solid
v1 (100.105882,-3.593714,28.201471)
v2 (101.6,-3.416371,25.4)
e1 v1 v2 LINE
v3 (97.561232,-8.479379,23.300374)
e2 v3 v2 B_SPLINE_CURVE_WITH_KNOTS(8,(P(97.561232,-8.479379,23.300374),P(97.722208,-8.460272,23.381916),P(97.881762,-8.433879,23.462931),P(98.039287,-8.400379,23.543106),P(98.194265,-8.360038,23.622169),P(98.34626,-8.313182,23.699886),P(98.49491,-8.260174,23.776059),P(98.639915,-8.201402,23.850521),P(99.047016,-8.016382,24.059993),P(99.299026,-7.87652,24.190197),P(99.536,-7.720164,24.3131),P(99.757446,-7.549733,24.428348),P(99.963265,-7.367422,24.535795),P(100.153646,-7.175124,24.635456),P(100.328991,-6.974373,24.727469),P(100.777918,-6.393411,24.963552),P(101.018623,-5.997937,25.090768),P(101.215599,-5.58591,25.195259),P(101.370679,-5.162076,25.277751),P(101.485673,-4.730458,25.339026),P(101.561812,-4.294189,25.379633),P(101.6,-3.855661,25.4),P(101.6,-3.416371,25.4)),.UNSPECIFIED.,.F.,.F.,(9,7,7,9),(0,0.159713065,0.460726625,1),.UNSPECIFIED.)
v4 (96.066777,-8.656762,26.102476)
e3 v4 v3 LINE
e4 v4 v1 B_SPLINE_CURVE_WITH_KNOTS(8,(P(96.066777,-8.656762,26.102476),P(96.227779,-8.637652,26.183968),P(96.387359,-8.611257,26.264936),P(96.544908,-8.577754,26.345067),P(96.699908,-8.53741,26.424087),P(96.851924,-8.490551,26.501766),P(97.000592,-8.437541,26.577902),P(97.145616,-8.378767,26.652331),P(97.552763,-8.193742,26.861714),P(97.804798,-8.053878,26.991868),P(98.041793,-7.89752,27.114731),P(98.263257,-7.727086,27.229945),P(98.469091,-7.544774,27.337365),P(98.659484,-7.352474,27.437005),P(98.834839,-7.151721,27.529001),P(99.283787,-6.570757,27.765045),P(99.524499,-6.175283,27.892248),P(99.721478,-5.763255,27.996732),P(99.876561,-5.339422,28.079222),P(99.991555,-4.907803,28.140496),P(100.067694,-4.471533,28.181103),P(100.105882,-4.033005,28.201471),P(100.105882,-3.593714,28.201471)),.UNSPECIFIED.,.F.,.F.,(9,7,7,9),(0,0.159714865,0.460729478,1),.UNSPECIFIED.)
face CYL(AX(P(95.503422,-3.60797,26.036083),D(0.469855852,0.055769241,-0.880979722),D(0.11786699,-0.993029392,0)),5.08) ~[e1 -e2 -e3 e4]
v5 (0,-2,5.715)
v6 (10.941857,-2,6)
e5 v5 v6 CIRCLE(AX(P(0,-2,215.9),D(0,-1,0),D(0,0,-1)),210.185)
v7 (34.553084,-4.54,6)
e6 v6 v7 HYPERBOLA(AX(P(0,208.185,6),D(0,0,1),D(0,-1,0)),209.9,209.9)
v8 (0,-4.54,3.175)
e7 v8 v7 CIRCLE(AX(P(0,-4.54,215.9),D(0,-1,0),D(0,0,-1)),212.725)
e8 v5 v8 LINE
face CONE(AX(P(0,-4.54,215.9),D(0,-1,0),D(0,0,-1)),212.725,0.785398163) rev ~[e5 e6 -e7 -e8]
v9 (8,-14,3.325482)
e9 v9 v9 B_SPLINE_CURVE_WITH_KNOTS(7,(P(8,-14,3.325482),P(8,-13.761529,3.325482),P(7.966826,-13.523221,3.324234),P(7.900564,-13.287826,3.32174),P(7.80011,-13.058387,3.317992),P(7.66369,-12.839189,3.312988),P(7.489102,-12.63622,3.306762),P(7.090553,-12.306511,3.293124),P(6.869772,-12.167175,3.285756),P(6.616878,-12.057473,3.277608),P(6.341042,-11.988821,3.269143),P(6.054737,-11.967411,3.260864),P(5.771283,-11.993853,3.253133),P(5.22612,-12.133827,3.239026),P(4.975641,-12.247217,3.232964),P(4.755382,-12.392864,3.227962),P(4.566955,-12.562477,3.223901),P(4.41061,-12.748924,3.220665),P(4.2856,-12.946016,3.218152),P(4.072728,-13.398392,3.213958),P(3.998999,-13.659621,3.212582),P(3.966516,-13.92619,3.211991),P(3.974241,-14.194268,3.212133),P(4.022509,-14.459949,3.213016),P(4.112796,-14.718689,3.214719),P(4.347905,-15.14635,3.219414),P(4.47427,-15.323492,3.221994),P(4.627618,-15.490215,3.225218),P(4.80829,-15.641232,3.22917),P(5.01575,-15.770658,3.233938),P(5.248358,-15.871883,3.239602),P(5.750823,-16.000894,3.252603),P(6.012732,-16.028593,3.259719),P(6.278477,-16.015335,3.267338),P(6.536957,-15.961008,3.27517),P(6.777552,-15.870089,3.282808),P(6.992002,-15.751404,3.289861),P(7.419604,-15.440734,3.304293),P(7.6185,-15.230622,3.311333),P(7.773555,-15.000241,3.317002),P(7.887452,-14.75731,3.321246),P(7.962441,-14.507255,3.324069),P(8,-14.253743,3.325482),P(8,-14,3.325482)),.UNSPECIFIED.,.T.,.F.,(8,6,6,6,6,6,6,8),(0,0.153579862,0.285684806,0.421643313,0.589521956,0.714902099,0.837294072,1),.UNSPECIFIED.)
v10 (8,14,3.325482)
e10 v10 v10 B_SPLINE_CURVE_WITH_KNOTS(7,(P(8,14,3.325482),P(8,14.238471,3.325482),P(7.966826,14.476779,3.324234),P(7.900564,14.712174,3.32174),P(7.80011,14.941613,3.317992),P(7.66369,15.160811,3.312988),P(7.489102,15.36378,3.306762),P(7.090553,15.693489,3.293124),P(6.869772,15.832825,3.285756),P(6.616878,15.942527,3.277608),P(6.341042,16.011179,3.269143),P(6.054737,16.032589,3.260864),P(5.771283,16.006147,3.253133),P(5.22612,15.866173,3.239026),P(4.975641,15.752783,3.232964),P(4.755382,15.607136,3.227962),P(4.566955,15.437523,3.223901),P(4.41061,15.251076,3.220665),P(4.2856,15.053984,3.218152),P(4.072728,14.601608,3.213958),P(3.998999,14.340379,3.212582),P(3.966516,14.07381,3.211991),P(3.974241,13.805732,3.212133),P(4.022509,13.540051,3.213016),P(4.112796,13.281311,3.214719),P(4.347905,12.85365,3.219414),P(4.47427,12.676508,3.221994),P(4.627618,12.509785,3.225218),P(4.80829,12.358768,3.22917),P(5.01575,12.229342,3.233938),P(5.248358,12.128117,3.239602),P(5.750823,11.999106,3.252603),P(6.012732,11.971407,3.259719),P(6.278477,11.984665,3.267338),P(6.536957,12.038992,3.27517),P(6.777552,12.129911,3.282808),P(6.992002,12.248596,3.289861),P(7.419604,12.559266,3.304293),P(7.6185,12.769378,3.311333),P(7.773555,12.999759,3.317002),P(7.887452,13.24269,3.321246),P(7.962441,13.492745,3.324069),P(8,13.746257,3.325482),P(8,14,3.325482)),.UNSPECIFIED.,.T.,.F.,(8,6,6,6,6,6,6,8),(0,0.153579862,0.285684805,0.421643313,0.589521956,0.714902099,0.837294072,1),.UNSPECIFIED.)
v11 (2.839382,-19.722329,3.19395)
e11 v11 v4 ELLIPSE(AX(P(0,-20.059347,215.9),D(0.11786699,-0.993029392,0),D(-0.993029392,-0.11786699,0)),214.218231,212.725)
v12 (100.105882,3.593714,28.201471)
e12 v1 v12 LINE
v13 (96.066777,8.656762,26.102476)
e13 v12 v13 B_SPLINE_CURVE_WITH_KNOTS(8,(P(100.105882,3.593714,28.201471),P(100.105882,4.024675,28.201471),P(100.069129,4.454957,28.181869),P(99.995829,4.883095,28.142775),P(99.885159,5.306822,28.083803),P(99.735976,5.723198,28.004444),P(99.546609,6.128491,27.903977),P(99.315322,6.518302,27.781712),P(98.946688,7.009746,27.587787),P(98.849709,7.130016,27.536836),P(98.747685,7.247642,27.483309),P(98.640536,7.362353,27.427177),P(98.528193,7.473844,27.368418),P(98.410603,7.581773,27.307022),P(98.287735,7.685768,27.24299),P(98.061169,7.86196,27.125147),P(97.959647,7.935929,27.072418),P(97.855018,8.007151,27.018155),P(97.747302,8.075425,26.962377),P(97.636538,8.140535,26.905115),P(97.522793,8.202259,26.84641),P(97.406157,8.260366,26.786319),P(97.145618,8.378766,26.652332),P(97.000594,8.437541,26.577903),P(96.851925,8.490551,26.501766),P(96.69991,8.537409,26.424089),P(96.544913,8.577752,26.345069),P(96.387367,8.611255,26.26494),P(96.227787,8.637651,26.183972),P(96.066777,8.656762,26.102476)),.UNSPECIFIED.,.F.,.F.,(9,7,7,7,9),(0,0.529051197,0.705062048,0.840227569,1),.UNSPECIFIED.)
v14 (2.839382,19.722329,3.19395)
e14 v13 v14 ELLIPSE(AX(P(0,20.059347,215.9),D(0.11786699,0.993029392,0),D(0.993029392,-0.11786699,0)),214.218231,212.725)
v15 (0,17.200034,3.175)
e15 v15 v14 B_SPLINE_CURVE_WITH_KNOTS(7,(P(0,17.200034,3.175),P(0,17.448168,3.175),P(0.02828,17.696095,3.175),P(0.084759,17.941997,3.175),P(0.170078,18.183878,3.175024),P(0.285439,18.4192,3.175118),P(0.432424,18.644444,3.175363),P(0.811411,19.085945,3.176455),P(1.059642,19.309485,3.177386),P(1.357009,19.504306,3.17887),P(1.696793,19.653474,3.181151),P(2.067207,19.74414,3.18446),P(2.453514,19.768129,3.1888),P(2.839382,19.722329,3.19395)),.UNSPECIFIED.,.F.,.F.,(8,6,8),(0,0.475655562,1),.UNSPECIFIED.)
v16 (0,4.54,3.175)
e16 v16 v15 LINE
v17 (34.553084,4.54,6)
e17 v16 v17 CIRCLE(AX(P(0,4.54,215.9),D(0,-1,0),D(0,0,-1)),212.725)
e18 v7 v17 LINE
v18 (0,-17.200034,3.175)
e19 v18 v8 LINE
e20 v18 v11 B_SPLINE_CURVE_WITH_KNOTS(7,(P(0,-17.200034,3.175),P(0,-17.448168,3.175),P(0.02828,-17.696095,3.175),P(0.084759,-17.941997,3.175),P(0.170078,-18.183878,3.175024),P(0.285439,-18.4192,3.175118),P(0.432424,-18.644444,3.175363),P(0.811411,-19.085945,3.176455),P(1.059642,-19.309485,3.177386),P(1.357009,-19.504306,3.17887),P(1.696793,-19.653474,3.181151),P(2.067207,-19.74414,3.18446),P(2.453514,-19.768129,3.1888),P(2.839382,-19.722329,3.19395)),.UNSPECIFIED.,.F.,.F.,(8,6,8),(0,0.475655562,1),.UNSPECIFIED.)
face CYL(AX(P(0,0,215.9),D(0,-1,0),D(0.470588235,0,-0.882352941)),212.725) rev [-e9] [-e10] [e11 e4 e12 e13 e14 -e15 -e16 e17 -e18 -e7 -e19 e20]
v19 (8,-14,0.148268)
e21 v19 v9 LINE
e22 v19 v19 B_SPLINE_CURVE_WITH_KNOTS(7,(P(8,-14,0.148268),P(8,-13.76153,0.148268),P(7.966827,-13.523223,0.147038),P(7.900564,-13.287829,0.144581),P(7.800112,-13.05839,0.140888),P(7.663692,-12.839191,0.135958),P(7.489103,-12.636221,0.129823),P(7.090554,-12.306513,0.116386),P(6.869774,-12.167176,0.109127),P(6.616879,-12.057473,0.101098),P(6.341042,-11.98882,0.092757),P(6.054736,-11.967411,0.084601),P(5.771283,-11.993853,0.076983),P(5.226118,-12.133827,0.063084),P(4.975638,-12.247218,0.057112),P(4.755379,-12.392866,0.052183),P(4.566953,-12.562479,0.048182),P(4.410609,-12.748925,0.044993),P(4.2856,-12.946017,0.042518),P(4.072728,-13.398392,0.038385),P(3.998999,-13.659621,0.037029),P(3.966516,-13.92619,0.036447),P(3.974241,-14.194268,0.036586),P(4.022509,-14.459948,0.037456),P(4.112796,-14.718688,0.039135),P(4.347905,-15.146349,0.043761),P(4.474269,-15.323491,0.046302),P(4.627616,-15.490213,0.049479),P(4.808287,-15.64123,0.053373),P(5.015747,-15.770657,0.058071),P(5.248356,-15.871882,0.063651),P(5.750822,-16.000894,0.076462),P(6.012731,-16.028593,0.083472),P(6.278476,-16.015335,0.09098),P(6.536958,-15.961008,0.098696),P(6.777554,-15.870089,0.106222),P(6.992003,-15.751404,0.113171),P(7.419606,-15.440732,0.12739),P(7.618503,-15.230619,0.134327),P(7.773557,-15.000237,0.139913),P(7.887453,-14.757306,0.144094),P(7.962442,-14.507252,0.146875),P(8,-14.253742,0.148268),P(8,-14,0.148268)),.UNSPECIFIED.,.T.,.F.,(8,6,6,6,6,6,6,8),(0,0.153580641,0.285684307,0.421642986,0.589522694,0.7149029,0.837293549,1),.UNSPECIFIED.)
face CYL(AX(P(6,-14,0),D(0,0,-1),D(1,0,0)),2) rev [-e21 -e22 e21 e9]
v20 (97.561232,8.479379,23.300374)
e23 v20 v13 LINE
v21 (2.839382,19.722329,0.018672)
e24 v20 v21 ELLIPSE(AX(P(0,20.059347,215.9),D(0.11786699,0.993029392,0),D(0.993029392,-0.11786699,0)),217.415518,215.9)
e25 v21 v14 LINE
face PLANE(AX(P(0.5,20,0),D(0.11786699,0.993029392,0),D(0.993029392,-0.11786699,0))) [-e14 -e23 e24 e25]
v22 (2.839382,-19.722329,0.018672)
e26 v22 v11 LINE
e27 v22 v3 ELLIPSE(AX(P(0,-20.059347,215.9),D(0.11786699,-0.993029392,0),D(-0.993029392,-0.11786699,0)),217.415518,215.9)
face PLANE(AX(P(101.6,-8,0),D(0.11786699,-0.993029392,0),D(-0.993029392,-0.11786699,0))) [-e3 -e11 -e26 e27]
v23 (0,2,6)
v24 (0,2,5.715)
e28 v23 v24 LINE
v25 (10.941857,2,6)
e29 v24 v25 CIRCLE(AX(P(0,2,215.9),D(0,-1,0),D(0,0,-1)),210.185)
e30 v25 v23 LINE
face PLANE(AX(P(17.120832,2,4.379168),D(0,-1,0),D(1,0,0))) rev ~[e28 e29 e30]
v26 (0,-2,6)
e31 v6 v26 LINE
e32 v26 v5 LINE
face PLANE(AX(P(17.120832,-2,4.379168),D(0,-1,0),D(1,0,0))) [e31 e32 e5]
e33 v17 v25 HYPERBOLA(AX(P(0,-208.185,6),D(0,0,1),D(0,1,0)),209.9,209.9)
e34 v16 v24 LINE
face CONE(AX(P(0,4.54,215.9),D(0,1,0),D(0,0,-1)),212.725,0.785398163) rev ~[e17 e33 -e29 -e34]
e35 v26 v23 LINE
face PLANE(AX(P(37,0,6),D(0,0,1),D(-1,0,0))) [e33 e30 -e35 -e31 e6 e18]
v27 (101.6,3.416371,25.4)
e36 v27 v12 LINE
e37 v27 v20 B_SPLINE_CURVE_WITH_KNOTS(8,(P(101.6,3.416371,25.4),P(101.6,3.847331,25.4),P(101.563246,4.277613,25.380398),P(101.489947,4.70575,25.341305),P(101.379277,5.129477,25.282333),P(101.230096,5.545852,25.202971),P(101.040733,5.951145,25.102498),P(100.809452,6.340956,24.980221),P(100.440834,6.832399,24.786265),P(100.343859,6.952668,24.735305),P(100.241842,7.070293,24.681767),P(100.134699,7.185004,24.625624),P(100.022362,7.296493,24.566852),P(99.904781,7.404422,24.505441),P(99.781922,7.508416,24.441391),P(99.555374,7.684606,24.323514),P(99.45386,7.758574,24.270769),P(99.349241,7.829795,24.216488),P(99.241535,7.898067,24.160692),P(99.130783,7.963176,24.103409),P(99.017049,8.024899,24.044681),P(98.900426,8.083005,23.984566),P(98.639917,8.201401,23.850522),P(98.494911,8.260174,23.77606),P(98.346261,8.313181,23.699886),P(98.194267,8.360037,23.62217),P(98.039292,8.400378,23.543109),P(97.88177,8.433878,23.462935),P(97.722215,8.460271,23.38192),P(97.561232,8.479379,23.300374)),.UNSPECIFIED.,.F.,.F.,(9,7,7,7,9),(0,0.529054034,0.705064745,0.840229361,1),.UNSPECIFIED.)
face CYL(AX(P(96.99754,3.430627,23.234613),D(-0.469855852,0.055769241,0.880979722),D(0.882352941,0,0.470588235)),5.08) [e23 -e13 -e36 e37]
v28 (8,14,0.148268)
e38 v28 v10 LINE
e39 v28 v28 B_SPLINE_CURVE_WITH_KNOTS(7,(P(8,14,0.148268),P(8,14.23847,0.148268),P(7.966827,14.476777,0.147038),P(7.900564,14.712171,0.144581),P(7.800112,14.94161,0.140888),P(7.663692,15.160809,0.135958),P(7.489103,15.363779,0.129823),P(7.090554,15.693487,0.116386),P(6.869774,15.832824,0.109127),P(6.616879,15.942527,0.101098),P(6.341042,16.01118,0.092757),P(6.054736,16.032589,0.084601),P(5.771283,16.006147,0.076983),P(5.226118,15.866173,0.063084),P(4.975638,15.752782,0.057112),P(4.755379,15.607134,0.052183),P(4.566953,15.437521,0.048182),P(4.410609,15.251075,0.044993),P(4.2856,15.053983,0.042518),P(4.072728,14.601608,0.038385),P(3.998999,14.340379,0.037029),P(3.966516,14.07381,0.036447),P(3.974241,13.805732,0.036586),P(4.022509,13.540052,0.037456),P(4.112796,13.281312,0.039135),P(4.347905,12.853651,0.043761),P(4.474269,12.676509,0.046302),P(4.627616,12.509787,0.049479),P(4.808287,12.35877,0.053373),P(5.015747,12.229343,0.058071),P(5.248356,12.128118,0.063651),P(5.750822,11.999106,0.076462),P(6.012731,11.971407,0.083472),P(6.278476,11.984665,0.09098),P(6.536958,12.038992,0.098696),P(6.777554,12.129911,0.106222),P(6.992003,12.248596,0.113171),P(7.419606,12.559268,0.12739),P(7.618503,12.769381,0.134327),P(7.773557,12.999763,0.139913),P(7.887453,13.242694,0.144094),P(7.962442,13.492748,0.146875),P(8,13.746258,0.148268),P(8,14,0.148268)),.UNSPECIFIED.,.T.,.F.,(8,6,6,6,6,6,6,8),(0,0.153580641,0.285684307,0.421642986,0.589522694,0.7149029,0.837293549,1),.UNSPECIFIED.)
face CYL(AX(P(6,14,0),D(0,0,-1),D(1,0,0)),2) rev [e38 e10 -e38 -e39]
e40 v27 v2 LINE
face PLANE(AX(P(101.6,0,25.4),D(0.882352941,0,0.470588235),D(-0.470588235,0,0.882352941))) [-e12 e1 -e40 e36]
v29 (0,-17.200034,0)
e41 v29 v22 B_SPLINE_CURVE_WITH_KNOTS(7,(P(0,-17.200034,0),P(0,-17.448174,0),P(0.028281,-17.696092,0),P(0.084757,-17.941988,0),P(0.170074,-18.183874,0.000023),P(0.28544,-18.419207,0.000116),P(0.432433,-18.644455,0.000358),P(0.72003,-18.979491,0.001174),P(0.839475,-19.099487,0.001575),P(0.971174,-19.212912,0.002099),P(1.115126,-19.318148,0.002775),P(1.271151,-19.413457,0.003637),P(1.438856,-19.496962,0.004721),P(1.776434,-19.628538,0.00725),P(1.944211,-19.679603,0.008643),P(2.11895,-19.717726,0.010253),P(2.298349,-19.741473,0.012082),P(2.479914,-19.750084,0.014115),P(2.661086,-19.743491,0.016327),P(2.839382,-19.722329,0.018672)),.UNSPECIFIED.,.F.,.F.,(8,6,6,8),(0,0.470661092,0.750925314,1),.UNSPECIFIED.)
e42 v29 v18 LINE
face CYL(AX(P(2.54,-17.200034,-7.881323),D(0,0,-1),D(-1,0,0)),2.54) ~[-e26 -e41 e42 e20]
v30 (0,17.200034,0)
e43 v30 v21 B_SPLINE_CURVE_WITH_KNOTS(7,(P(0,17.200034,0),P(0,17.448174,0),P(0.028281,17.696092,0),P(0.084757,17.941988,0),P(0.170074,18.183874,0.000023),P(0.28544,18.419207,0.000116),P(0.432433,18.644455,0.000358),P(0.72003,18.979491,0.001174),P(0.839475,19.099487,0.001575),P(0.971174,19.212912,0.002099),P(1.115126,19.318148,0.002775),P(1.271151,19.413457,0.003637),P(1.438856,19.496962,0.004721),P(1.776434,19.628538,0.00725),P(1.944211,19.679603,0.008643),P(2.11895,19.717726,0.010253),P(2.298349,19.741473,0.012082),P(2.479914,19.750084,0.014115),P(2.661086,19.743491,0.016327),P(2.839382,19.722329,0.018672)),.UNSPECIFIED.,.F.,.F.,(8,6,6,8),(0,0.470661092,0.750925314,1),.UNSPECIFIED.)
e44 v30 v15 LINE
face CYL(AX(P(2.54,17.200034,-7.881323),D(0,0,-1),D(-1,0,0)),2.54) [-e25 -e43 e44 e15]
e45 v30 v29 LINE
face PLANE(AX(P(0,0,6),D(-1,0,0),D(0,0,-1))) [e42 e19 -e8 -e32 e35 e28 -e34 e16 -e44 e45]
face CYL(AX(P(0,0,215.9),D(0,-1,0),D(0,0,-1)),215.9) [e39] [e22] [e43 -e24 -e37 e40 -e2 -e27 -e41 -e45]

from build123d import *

# Parameters (mm, degrees)
F1_DEPTH      = 20
F1_DEPTH_BACK = 20
F2_R          = 2
F3_DEPTH      = 25.4
F5_DEPTH      = 50.8
F7_DEPTH      = 2
F7_DEPTH_BACK = 2
F8_SIZE       = 2.54
F9_R          = 5.08
F10_T1_DEPTH  = 15.875
F11_T1_DEPTH  = 18.9511481059


# Not quite as in the source:
# - a fillet or chamfer that OpenCascade refuses, or shapes differently, is made with other operations: its cross-section is extruded or revolved along the edge and cut away or added


with BuildPart() as f1:
    # F0 (on Front) → F1 (new body, two sides)
    with BuildSketch(Plane.XZ) as f1_sk:
        with BuildLine():
            Line((0, 3.175), (0, 0))
            ThreePointArc((0, 0), (52.3634414453, 6.4462342186), (101.6, 25.4))
            Line((101.6, 25.4), (100.1058823529, 28.2014705882))
            ThreePointArc((100.1058823529, 28.2014705882), (51.5933908359, 9.5264366566), (0, 3.175))
        make_face()
    extrude(amount=F1_DEPTH)
    extrude(f1_sk.sketch, amount=-F1_DEPTH_BACK)

    # F2 (on Top) → F3 (cut)
    with BuildSketch(Plane.XY):
        with Locations((6, 14)):
            Circle(F2_R)
        with Locations((6, -14)):
            Circle(F2_R)
    extrude(amount=F3_DEPTH, mode=Mode.SUBTRACT)

    # F4 (on Top) → F5 (cut)
    with BuildSketch(Plane.XY):
        Polygon((0.5, 20), (101.6, 8), (101.6, 20), align=None)
        Polygon((101.6, -8), (0.5, -20), (101.6, -20), align=None)
    extrude(amount=F5_DEPTH, mode=Mode.SUBTRACT)

    # F6 (on Front) → F7 (join, two sides)
    with BuildSketch(Plane.XZ) as f7_sk:
        Polygon((0, 6), (0, 0), (37, 6), align=None)
    extrude(amount=F7_DEPTH)
    extrude(f7_sk.sketch, amount=-F7_DEPTH_BACK)

    # F8
    f8_edges = [f1.edges().sort_by_distance(p)[0] for p in [
        (17.334188, -2, 3.882426),
        (17.334188, 2, 3.882426),
    ]]
    chamfer(f8_edges, length=F8_SIZE)

    # F9
    f9_edges = [f1.edges().sort_by_distance(p)[0] for p in [
        (100.852941, -8.088672, 26.800735),
        (100.852941, 8.088672, 26.800735),
    ]]
    fillet(f9_edges, radius=F9_R)

    # F10: fillet of radius 2.54 on 2 edges, made by hand

    # F10_s2 → F10_t1 (cut)
    with BuildSketch(Plane.XY.offset(-6.35)):
        with BuildLine():
            ThreePointArc((0, -17.46), (0.7439487758, -19.2560512242), (2.54, -20))
            Line((2.54, -20), (0, -20))
            Line((0, -20), (0, -17.46))
        make_face()
        with BuildLine():
            ThreePointArc((2.54, 20), (0.7439487758, 19.2560512242), (0, 17.46))
            Line((0, 17.46), (0, 20))
            Line((0, 20), (2.54, 20))
        make_face()
    extrude(amount=F10_T1_DEPTH, mode=Mode.SUBTRACT)

    # F11: fillet of radius 2.54 on 2 edges, made by hand

    # F11_s2 → F11_t1 (cut)
    with BuildSketch(Plane.XY.offset(-7.8813228745)):
        with BuildLine():
            ThreePointArc((0, -17.2000338729), (0.8531139151, -19.0989849877), (2.8393821549, -19.7223285276))
            Line((2.8393821549, -19.7223285276), (2.8693203704, -19.9745579931))
            Line((2.8693203704, -19.9745579931), (1.7309730402, -20.1096734032))
            Line((1.7309730402, -20.1096734032), (1.6171383071, -20.0971883315))
            ThreePointArc((1.6171383071, -20.0971883315), (-0.254, -17.46), (-0.254, -17.2000338729))
            Line((-0.254, -17.2000338729), (0, -17.2000338729))
        make_face()
        with BuildLine():
            ThreePointArc((0, 17.2000338729), (0.8531139151, 19.0989849877), (2.8393821549, 19.7223285276))
            Line((2.8393821549, 19.7223285276), (2.8693203704, 19.9745579931))
            Line((2.8693203704, 19.9745579931), (1.7309730402, 20.1096734032))
            Line((1.7309730402, 20.1096734032), (1.6171383071, 20.0971883315))
            ThreePointArc((1.6171383071, 20.0971883315), (-0.254, 17.46), (-0.254, 17.2000338729))
            Line((-0.254, 17.2000338729), (0, 17.2000338729))
        make_face()
    extrude(amount=F11_T1_DEPTH, mode=Mode.SUBTRACT)


solid = f1.part
